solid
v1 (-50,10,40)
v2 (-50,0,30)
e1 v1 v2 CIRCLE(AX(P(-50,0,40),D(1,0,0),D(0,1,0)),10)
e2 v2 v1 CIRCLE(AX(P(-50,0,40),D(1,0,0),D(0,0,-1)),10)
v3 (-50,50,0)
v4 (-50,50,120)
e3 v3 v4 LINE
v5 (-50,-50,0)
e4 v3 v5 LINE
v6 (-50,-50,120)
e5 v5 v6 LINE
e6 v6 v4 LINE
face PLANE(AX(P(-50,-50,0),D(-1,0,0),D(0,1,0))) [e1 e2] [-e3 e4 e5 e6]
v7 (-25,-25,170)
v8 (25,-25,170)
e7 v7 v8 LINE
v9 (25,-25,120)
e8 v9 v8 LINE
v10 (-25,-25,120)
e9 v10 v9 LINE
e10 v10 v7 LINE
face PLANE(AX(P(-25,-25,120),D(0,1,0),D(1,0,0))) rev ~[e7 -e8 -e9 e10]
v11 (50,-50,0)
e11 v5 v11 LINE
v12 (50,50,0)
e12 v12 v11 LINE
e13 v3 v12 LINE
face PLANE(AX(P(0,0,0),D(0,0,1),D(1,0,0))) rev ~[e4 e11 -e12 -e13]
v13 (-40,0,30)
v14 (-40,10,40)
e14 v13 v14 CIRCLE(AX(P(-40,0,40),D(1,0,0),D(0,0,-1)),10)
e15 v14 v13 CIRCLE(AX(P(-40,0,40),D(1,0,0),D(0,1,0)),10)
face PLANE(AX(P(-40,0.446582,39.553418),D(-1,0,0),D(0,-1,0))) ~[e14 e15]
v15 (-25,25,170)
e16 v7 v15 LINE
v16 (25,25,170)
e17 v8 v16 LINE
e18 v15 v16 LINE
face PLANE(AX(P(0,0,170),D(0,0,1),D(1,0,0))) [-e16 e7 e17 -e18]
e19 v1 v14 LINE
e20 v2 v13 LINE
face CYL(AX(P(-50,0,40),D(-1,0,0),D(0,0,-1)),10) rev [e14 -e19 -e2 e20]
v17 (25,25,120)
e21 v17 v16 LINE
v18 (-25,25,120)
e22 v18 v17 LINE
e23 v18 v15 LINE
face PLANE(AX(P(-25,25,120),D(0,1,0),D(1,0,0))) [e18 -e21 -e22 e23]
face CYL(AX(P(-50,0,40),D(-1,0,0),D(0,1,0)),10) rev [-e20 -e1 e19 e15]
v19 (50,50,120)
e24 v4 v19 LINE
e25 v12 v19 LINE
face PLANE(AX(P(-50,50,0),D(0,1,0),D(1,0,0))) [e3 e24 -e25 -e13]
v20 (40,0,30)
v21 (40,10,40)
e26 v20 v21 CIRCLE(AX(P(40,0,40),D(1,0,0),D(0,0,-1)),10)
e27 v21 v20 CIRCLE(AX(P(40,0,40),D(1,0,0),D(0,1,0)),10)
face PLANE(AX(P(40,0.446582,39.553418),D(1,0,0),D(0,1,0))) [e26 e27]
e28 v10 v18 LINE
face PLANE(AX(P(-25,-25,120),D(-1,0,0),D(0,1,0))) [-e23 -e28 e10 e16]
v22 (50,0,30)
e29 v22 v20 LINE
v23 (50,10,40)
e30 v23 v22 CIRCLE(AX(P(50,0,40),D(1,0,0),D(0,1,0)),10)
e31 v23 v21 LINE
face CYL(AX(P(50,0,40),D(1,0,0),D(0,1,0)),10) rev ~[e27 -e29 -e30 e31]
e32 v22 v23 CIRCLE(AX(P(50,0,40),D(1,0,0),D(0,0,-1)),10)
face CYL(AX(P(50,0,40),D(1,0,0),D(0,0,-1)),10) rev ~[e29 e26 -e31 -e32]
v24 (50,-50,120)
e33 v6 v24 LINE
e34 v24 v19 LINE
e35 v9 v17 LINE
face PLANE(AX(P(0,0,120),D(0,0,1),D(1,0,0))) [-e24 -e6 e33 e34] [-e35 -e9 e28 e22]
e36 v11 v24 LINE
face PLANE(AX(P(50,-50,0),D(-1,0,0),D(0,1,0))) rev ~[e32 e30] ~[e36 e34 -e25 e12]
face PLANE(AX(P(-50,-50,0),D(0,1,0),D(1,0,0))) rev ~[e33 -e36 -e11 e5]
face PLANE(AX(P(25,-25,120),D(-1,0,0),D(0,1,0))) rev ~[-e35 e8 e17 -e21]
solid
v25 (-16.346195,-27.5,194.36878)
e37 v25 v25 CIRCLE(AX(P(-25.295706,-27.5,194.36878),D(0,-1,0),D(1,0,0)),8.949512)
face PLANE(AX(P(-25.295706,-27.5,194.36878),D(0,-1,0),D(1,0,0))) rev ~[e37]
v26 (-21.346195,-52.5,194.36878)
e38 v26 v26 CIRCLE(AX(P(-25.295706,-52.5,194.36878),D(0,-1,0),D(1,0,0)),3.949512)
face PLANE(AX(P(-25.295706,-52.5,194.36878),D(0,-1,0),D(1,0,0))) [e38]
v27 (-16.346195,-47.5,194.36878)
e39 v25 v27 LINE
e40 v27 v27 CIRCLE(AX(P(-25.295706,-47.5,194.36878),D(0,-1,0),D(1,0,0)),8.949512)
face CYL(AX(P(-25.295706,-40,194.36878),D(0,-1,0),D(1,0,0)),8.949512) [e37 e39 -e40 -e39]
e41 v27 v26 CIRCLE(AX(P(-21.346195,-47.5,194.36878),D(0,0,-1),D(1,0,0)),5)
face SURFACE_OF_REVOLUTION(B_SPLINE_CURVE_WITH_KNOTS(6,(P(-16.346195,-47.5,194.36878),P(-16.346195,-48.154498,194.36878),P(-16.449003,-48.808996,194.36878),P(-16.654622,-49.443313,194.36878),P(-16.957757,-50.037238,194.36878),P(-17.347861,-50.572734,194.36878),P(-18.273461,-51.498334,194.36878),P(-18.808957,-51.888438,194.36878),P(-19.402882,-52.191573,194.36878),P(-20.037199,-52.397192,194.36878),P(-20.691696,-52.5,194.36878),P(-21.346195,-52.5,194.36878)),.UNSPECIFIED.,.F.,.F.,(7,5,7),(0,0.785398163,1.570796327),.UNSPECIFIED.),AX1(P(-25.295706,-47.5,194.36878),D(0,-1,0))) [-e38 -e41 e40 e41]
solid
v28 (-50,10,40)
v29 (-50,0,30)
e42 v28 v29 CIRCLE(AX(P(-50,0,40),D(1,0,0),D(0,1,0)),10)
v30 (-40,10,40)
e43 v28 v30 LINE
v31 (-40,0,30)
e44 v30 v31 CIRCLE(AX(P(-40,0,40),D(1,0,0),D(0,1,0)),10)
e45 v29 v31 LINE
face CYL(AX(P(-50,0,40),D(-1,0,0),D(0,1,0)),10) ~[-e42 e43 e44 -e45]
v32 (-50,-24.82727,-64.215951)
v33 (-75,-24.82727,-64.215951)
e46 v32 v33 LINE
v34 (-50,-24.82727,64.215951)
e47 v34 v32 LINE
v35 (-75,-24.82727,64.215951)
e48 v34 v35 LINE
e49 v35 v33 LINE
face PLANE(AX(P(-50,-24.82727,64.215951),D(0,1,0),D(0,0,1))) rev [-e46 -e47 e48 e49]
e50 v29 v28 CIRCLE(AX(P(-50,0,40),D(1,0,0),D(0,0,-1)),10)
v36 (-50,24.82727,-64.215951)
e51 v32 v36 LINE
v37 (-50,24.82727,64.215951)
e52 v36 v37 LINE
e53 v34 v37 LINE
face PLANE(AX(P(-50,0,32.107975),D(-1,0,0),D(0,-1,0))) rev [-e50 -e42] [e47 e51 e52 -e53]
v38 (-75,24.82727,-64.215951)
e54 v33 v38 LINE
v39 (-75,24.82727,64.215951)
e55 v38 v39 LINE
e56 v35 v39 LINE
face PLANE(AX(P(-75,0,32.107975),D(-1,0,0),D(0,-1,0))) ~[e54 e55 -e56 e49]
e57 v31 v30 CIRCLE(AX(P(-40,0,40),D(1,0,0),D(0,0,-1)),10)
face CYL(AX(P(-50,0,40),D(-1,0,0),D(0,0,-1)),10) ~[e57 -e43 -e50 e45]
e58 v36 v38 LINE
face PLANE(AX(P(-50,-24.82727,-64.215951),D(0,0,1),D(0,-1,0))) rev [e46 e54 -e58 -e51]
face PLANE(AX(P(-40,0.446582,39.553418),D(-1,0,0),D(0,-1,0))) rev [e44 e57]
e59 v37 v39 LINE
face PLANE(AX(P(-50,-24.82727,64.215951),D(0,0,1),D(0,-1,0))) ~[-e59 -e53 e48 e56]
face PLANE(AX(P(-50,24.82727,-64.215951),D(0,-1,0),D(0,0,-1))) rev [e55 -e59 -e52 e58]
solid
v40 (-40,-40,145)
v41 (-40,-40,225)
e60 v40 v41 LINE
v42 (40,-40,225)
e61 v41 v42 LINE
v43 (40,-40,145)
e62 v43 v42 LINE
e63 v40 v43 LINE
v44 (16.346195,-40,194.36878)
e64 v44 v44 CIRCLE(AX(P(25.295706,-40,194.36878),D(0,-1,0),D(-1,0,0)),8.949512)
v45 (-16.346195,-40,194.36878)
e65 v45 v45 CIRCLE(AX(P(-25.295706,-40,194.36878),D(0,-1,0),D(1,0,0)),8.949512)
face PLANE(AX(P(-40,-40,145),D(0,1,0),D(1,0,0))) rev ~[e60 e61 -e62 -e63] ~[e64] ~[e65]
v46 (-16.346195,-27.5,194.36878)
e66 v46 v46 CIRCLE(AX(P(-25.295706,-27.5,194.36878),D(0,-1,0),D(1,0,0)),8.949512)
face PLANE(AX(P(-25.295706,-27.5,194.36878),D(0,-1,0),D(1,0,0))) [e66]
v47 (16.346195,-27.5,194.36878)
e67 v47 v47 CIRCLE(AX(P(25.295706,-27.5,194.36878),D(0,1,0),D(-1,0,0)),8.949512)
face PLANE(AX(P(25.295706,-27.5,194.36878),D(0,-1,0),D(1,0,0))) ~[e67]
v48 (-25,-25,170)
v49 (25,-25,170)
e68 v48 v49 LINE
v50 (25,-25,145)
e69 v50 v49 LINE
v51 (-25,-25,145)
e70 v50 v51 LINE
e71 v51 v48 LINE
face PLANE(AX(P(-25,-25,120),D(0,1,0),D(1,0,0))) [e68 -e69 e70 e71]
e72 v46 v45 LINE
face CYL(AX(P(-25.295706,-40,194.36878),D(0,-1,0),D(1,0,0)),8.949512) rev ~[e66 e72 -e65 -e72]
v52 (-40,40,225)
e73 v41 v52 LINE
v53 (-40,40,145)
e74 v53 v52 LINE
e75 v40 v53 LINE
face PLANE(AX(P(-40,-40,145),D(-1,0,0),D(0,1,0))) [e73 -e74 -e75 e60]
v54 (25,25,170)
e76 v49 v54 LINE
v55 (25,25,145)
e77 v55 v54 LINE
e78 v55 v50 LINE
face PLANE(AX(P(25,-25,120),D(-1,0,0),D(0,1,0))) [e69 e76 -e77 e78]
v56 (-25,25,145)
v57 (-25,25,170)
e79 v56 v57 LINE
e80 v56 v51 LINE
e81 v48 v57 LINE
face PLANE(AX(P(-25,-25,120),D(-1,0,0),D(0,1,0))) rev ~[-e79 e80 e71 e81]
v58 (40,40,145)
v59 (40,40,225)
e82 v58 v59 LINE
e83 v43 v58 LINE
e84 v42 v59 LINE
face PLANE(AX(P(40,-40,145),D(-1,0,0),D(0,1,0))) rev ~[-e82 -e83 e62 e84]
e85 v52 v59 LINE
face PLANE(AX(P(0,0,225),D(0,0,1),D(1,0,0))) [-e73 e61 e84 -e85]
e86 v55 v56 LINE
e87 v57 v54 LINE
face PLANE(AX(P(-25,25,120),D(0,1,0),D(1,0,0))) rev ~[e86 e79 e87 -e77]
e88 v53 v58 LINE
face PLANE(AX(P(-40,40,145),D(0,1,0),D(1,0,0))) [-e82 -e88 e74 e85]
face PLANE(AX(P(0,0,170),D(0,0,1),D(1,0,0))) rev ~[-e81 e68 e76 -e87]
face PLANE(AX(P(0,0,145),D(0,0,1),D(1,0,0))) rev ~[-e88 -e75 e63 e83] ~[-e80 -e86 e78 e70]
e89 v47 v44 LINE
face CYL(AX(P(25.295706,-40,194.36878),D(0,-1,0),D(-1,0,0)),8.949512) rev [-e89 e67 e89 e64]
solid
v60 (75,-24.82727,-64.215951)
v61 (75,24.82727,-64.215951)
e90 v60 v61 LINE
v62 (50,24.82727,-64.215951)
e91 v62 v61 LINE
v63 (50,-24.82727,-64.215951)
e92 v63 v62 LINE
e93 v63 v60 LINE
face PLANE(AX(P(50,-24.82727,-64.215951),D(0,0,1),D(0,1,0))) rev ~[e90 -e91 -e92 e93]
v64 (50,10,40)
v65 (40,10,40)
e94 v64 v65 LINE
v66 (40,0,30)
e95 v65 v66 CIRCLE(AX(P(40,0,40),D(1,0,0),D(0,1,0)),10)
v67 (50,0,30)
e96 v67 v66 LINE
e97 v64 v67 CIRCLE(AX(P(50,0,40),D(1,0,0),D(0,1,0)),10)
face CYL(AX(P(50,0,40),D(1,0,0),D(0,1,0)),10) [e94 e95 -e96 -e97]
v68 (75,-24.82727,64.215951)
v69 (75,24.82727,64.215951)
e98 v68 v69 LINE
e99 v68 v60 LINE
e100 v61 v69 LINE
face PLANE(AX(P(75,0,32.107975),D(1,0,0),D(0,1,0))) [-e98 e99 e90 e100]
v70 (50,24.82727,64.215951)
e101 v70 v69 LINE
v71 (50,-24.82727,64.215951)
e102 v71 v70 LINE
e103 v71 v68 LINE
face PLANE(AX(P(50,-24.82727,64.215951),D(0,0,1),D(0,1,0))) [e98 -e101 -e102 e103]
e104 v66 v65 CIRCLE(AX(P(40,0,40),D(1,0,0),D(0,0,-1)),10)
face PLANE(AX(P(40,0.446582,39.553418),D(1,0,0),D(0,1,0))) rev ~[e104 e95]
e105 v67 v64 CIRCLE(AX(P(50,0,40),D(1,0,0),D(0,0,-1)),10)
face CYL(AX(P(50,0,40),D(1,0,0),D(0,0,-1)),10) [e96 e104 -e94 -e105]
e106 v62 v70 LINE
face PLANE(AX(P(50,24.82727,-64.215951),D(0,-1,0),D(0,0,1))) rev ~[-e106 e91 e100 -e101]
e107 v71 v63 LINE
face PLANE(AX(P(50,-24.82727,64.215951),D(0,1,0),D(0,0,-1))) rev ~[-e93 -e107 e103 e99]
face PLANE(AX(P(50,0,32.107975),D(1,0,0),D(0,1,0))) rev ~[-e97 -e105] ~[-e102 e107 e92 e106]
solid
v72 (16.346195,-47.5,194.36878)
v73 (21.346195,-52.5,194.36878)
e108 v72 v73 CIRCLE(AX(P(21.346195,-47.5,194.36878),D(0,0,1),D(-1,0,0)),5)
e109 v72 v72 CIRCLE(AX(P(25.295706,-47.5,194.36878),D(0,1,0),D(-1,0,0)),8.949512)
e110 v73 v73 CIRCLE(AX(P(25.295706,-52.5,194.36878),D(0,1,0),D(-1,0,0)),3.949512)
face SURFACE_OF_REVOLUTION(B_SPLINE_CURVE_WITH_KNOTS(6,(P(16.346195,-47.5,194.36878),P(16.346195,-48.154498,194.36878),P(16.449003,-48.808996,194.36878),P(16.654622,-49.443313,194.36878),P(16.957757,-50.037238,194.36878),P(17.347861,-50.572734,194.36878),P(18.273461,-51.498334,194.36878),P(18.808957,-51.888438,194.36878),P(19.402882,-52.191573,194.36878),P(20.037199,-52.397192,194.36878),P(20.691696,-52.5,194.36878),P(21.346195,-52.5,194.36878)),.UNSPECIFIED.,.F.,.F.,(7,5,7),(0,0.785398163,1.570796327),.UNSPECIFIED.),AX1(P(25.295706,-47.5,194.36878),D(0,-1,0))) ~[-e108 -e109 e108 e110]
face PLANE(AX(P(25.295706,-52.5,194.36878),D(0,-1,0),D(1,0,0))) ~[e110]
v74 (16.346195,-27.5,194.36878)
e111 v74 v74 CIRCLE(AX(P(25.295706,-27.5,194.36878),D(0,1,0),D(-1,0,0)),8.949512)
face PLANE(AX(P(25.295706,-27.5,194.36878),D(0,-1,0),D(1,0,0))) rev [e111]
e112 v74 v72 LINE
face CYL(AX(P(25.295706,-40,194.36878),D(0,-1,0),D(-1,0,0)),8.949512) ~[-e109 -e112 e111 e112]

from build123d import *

# Parameters (mm, degrees)
F0_W      = 100
F0_H      = 100
F1_DEPTH  = 120
F2_W      = 50
F2_H      = 50
F3_DEPTH  = 50
F5_W      = 80
F5_H      = 80
F6_DEPTH  = 80
F9_DEPTH  = 10
F10_W     = 49.6545396745
F10_H     = 64.2159506679
F11_DEPTH = 25
F15_R     = 8.949511536
F16_DEPTH = 12.5
F19_R     = 5
F19_2_R   = 5


with BuildPart() as f1:
    # F0 (on Top) → F1 (new body)
    with BuildSketch(Plane.XY):
        Rectangle(F0_W, F0_H)
    extrude(amount=F1_DEPTH)

    # F2 (on face) → F3 (join)
    with BuildSketch(Plane.XY.offset(120)):
        Rectangle(F2_W, F2_H)
    extrude(amount=F3_DEPTH)


with BuildPart() as f6:
    # F5 (on offset) → F6 (new body)
    with BuildSketch(Plane.XY.offset(145)):
        Rectangle(F5_W, F5_H)
    extrude(amount=F6_DEPTH)

    # F7: cut F1
    add(f1.part, mode=Mode.SUBTRACT)


with BuildPart() as f9:
    # F8 (on face) → F9 (new body)
    with BuildSketch(Plane.YZ.offset(50)):
        with BuildLine():
            ThreePointArc((10, 40), (-7.0710678119, 47.0710678119), (0, 30))
            ThreePointArc((0, 30), (7.0710678119, 32.9289321881), (10, 40))
        make_face()
    extrude(amount=-F9_DEPTH)

    # F10 (on face) → F11 (join)
    with BuildSketch(Plane.YZ.offset(50)):
        with Locations((0, 32.1079753339)):
            Rectangle(F10_W, F10_H)
        with Locations((0, -32.1079753339)):
            Rectangle(F10_W, F10_H)
    extrude(amount=F11_DEPTH)


with BuildPart() as f1_1:
    add(f1.part)

    # F12: cut F9
    add(f9.part, mode=Mode.SUBTRACT)


with BuildPart() as f13_1:
    # F13: instance of F9
    add(f9.part.mirror(Plane.YZ))


with BuildPart() as f1_2:
    add(f1_1.part)

    # F14: cut F13_1
    add(f13_1.part, mode=Mode.SUBTRACT)


with BuildPart() as f16:
    # F15 (on face) → F16 (new body, symmetric)
    with BuildSketch(Plane.XZ.offset(40)):
        with Locations((-25.2957064658, 194.3687796593)):
            Circle(F15_R)
    extrude(amount=F16_DEPTH, both=True)


with BuildPart() as f17_1:
    # F17: instance of F16
    add(f16.part.mirror(Plane.YZ))


with BuildPart() as f6_1:
    add(f6.part)

    # F18: cut F16, F17_1
    add(f16.part, mode=Mode.SUBTRACT)
    add(f17_1.part, mode=Mode.SUBTRACT)


with BuildPart() as f16_1:
    add(f16.part)

    # F19
    f19_edges = [f16_1.edges().sort_by_distance(p)[0] for p in [
        (-34.245218, -52.5, 194.36878),
    ]]
    fillet(f19_edges, radius=F19_R)


with BuildPart() as f17_1_1:
    add(f17_1.part)

    # F19#2
    f19_2_edges = [f17_1_1.edges().sort_by_distance(p)[0] for p in [
        (34.245218, -52.5, 194.36878),
    ]]
    fillet(f19_2_edges, radius=F19_2_R)


solid = Compound([f9.part, f13_1.part, f1_2.part, f6_1.part, f16_1.part, f17_1_1.part])
